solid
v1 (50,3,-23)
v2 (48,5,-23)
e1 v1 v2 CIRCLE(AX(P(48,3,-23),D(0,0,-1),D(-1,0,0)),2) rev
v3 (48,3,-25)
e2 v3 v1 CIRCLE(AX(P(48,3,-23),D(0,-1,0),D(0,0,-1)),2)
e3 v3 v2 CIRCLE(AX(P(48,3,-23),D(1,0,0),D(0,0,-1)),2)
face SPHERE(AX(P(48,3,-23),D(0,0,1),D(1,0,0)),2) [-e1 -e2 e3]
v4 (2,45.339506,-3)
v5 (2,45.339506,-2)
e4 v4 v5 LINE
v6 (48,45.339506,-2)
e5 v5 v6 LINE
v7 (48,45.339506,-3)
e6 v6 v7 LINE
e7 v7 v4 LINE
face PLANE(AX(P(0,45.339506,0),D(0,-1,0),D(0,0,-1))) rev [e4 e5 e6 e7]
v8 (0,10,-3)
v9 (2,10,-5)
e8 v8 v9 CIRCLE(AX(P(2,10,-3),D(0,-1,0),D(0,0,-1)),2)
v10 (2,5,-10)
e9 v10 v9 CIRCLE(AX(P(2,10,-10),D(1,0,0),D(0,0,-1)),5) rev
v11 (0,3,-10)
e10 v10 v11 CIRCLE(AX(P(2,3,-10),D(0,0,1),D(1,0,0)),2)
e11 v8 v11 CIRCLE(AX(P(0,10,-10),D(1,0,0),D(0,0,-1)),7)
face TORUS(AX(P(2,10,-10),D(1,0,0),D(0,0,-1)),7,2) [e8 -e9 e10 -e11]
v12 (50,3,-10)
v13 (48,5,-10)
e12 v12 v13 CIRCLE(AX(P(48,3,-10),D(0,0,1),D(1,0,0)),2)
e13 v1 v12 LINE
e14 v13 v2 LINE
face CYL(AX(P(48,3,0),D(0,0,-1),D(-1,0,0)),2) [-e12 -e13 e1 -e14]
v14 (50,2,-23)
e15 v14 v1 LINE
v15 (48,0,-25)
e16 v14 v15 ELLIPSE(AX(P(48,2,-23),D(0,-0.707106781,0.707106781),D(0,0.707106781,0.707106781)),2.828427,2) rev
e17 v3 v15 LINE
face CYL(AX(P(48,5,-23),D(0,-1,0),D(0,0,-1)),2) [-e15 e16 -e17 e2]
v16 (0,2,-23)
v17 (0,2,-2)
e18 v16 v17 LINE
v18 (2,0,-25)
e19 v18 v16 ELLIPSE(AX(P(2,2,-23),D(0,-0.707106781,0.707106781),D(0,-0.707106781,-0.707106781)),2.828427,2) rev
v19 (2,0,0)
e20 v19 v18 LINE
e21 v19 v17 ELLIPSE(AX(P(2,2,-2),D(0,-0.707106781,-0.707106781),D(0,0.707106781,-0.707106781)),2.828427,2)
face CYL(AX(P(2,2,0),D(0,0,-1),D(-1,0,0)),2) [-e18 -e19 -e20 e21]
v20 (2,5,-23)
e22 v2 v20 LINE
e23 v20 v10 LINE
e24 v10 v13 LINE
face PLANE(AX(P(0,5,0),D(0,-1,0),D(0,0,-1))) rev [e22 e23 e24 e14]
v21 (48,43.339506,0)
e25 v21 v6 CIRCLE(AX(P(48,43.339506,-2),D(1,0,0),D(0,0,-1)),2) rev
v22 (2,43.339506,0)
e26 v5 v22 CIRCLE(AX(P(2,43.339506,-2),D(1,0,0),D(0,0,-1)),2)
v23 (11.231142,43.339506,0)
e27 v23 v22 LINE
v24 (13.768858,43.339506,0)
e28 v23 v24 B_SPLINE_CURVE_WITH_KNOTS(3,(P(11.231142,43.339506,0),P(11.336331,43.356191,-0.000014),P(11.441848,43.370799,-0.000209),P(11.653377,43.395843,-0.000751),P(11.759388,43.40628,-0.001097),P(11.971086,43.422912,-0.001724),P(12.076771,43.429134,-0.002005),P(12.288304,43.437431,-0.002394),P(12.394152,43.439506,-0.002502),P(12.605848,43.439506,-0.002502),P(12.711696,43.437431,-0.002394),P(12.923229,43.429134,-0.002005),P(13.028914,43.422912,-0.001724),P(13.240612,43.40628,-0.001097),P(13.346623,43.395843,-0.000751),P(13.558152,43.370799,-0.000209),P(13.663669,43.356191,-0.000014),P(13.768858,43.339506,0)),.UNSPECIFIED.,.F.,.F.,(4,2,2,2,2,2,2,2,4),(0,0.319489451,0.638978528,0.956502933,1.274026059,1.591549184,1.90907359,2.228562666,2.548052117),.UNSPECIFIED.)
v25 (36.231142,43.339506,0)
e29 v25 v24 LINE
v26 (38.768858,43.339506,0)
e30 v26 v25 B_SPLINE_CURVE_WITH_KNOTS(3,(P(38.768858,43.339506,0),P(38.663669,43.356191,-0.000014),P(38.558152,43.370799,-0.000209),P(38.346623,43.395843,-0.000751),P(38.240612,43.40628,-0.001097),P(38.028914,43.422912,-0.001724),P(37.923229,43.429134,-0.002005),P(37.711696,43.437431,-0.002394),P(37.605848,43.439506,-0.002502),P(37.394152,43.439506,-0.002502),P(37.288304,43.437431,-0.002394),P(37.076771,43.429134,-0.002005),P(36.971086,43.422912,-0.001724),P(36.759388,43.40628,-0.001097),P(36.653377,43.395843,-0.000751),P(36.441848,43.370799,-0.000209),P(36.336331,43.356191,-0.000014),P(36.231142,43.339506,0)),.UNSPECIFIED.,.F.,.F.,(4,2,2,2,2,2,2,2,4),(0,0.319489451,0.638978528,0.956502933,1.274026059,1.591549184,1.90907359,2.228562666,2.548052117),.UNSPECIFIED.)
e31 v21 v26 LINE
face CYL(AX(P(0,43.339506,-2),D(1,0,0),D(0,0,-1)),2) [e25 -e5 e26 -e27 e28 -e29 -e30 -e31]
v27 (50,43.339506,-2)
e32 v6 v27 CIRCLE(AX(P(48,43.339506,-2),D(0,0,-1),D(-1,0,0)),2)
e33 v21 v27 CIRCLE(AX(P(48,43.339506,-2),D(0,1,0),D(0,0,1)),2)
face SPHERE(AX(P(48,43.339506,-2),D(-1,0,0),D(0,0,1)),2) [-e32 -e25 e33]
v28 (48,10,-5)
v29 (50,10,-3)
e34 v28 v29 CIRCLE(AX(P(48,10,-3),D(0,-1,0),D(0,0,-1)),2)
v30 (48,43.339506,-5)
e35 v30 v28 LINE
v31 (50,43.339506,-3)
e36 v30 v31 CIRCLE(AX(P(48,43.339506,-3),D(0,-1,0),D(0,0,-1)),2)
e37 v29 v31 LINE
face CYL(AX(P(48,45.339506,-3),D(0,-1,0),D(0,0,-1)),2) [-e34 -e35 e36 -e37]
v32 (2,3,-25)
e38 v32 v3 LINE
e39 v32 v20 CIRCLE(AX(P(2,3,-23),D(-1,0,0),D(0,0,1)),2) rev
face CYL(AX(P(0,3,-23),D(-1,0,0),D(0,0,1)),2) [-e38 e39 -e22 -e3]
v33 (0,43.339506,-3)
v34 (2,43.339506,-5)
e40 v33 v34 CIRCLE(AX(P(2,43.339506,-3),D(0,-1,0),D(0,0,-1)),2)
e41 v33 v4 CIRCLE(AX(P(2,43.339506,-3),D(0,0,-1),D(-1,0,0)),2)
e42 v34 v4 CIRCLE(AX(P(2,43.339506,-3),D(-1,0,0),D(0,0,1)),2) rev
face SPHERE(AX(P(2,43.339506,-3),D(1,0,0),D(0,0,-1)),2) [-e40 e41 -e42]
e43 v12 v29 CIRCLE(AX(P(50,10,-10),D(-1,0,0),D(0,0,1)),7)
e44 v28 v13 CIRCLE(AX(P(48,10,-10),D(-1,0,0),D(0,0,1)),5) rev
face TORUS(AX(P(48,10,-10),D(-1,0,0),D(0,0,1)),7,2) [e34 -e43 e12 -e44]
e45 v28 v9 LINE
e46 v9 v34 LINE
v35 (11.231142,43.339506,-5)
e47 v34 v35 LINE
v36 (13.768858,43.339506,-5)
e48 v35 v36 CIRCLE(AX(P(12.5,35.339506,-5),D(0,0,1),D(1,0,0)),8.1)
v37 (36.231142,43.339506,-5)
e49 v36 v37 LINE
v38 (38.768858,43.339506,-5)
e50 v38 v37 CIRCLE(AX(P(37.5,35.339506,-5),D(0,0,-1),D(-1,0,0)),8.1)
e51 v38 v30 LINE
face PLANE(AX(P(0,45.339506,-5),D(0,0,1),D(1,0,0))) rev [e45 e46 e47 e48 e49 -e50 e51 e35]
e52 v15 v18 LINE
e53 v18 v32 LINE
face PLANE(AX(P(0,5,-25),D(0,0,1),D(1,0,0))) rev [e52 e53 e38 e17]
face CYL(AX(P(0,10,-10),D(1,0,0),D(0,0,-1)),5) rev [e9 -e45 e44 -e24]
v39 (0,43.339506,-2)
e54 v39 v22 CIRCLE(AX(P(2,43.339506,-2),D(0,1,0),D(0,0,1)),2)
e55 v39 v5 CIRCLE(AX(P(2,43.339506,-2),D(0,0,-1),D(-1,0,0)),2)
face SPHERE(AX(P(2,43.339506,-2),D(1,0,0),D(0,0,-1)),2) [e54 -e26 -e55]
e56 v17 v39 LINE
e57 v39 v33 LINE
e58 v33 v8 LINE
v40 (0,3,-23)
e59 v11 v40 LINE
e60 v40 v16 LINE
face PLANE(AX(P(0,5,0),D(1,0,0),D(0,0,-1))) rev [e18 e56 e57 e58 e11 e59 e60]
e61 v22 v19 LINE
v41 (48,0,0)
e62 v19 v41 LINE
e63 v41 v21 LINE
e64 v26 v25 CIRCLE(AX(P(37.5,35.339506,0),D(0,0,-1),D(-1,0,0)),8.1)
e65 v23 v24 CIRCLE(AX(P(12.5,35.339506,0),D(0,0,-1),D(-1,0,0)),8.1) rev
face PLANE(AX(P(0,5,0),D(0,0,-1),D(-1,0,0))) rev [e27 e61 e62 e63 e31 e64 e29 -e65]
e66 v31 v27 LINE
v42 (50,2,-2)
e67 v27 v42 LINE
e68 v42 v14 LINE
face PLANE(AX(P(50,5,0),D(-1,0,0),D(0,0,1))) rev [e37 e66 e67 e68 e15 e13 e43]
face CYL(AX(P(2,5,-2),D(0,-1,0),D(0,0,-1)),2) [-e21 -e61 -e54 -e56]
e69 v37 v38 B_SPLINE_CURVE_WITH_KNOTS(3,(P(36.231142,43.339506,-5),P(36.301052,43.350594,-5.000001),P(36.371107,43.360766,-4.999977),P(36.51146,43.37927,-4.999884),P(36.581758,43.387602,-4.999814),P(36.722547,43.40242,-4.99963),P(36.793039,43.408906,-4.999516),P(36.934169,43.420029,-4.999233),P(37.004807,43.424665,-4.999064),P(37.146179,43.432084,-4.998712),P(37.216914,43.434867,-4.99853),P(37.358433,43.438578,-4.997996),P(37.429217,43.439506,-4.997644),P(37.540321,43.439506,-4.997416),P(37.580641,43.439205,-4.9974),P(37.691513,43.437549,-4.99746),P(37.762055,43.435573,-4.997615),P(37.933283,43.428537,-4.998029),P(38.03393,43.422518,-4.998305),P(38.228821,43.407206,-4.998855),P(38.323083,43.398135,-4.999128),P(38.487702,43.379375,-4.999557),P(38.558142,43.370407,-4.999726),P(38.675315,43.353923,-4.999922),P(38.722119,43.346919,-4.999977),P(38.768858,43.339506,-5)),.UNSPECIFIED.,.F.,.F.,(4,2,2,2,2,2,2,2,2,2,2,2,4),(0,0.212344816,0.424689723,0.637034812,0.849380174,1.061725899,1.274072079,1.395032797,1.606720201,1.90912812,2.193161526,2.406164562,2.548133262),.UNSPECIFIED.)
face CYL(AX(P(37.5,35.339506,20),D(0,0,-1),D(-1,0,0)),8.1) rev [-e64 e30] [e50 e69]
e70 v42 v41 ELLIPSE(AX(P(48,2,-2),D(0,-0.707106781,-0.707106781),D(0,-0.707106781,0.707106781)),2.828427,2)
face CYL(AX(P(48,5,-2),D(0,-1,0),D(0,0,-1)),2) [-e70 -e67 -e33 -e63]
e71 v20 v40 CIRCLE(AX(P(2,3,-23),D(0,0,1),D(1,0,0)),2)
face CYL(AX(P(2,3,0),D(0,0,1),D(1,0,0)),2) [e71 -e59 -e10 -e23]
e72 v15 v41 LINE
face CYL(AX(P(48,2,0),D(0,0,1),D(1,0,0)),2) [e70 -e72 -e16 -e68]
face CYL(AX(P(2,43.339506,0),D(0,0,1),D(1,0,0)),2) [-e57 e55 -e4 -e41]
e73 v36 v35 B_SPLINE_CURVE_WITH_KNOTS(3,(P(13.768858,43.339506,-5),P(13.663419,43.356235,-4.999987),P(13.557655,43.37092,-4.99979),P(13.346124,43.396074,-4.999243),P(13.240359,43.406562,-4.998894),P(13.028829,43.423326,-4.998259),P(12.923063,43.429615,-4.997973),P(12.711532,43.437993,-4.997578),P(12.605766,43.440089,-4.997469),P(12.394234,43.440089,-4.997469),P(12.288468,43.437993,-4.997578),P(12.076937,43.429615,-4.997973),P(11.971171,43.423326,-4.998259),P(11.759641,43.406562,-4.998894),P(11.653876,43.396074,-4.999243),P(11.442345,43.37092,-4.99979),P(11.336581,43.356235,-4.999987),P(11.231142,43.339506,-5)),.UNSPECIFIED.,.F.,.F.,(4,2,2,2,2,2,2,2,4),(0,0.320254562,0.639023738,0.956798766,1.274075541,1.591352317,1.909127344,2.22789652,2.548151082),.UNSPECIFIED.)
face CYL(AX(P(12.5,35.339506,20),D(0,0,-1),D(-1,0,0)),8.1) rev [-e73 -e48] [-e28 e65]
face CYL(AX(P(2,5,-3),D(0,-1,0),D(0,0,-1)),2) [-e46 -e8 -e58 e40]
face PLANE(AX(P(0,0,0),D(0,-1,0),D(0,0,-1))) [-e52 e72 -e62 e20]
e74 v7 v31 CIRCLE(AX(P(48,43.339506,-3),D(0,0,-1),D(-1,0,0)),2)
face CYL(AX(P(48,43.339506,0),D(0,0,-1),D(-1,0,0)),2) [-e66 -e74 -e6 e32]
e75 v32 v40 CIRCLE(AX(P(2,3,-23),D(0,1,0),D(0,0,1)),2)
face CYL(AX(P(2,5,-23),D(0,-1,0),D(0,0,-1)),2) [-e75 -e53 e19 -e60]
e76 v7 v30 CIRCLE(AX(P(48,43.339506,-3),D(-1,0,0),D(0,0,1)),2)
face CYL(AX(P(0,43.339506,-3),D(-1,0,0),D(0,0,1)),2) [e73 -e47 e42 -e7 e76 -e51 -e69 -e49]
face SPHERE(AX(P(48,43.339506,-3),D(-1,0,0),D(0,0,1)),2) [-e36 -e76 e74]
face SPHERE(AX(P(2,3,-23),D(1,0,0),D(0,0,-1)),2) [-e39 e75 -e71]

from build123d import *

# Parameters (mm, degrees)
SKETCH_2_W          = 50
SKETCH_2_H          = 25
EXTRUDE_4_DEPTH     = 5
SKETCH_7_W          = 50
SKETCH_7_H          = 5
EXTRUDE_5_DEPTH     = 40.339506062
FILLET_11_R         = 2
FILLET_12_R         = 2
FILLET_15_R         = 5
FILLET_17_R         = 2
FILLET_18_R         = 2
FILLET_19_R         = 2
SKETCH_8_R          = 8.1
CUT_EXTRUDE_4_DEPTH = 25


with BuildPart() as part:
    # 草图2 → 凸台-拉伸4 (new body)
    with BuildSketch(Plane(origin=(0, 0, 0), x_dir=(1, 0, 0), z_dir=(0, 1, 0))):
        with Locations((25, 12.5)):
            Rectangle(SKETCH_2_W, SKETCH_2_H)
    extrude(amount=EXTRUDE_4_DEPTH)

    # 草图7 → 凸台-拉伸5 (add)
    with BuildSketch(Plane(origin=(0, 5, 0), x_dir=(1, 0, 0), z_dir=(0, 1, 0))):
        with Locations((25, 2.5)):
            Rectangle(SKETCH_7_W, SKETCH_7_H)
    extrude(amount=EXTRUDE_5_DEPTH)

    # 圆角11
    fillet_11_edges = [part.edges().sort_by_distance(p)[0] for p in [
        (25, 45.339506062, 0),
    ]]
    fillet(fillet_11_edges, radius=FILLET_11_R)

    # 圆角12
    fillet_12_edges = [part.edges().sort_by_distance(p)[0] for p in [
        (25, 45.339506062, -5),
    ]]
    fillet(fillet_12_edges, radius=FILLET_12_R)

    # 圆角15
    fillet_15_edges = [part.edges().sort_by_distance(p)[0] for p in [
        (25, 5, -5),
    ]]
    fillet(fillet_15_edges, radius=FILLET_15_R)

    # 圆角17
    fillet_17_edges = [part.edges().sort_by_distance(p)[0] for p in [
        (50, 45.339506062, -2.5),
        (50, 21.669753031, 0),
        (50, 44.753719625, -0.585786438),
        (50, 26.669753031, -5),
        (50, 44.753719625, -4.414213562),
        (50, 5, -17.5),
        (50, 6.464466094, -6.464466094),
        (50, 0, -12.5),
        (50, 2.5, -25),
    ]]
    fillet(fillet_17_edges, radius=FILLET_17_R)

    # 圆角18
    # the kernel refuses this fillet: 2 mm, written as the material it takes off along each edge
    with BuildSketch(Plane(origin=(48, 3, -23), x_dir=(0, 0, -1), z_dir=(0, 1, 0))) as fillet_18_piece_1_section:
        Polygon((0, 0), (FILLET_18_R, 0), (FILLET_18_R, -FILLET_18_R), (0, -FILLET_18_R), align=None)
    fillet_18_piece_1 = extrude(amount=FILLET_18_R, mode=Mode.PRIVATE)
    fillet_18_piece_1 = fillet_18_piece_1 - Plane(origin=(48, 3, -23), x_dir=(-0.7071067811865475, 0, 0.7071067811865475), z_dir=(0, 1, 0)) * Sphere(FILLET_18_R, mode=Mode.PRIVATE)
    add(fillet_18_piece_1, mode=Mode.SUBTRACT)
    with BuildSketch(Plane(origin=(48, 5, -25), x_dir=(0, 0, 1), z_dir=(-1, 0, 0))) as fillet_18_piece_2:
        with BuildLine():
            CenterArc((FILLET_18_R, -FILLET_18_R), FILLET_18_R, 90, 90)
            Line((0, -FILLET_18_R), (0, 0))
            Line((0, 0), (FILLET_18_R, 0))
        make_face()
    extrude(amount=53, mode=Mode.SUBTRACT)

    # 圆角19
    fillet_19_edges = [part.edges().sort_by_distance(p)[0] for p in [
        (0, 21.669753031, 0),
        (0, 44.753719625, -0.585786438),
        (0, 45.339506062, -2.5),
        (0, 26.669753031, -5),
        (0, 44.753719625, -4.414213562),
        (0, 6.464466094, -6.464466094),
        (0, 0, -12.5),
        (0, 5, -16.5),
        (0, 1.5, -25),
        (0, 4.414213562, -24.414213562),
    ]]
    fillet(fillet_19_edges, radius=FILLET_19_R)

    # 草图8 → 切除-拉伸4 (cut)
    with BuildSketch(Plane(origin=(0, 0, -5), x_dir=(-1, 0, 0), z_dir=(0, 0, -1))):
        with Locations(Location((-37.5, 35.339506062, 0), (0, 0, 80.987548501))):
            Circle(SKETCH_8_R)
        with Locations(Location((-12.5, 35.339506062, 0), (0, 0, 80.987548501))):
            Circle(SKETCH_8_R)
    extrude(amount=-CUT_EXTRUDE_4_DEPTH, mode=Mode.SUBTRACT)


solid = part.part
